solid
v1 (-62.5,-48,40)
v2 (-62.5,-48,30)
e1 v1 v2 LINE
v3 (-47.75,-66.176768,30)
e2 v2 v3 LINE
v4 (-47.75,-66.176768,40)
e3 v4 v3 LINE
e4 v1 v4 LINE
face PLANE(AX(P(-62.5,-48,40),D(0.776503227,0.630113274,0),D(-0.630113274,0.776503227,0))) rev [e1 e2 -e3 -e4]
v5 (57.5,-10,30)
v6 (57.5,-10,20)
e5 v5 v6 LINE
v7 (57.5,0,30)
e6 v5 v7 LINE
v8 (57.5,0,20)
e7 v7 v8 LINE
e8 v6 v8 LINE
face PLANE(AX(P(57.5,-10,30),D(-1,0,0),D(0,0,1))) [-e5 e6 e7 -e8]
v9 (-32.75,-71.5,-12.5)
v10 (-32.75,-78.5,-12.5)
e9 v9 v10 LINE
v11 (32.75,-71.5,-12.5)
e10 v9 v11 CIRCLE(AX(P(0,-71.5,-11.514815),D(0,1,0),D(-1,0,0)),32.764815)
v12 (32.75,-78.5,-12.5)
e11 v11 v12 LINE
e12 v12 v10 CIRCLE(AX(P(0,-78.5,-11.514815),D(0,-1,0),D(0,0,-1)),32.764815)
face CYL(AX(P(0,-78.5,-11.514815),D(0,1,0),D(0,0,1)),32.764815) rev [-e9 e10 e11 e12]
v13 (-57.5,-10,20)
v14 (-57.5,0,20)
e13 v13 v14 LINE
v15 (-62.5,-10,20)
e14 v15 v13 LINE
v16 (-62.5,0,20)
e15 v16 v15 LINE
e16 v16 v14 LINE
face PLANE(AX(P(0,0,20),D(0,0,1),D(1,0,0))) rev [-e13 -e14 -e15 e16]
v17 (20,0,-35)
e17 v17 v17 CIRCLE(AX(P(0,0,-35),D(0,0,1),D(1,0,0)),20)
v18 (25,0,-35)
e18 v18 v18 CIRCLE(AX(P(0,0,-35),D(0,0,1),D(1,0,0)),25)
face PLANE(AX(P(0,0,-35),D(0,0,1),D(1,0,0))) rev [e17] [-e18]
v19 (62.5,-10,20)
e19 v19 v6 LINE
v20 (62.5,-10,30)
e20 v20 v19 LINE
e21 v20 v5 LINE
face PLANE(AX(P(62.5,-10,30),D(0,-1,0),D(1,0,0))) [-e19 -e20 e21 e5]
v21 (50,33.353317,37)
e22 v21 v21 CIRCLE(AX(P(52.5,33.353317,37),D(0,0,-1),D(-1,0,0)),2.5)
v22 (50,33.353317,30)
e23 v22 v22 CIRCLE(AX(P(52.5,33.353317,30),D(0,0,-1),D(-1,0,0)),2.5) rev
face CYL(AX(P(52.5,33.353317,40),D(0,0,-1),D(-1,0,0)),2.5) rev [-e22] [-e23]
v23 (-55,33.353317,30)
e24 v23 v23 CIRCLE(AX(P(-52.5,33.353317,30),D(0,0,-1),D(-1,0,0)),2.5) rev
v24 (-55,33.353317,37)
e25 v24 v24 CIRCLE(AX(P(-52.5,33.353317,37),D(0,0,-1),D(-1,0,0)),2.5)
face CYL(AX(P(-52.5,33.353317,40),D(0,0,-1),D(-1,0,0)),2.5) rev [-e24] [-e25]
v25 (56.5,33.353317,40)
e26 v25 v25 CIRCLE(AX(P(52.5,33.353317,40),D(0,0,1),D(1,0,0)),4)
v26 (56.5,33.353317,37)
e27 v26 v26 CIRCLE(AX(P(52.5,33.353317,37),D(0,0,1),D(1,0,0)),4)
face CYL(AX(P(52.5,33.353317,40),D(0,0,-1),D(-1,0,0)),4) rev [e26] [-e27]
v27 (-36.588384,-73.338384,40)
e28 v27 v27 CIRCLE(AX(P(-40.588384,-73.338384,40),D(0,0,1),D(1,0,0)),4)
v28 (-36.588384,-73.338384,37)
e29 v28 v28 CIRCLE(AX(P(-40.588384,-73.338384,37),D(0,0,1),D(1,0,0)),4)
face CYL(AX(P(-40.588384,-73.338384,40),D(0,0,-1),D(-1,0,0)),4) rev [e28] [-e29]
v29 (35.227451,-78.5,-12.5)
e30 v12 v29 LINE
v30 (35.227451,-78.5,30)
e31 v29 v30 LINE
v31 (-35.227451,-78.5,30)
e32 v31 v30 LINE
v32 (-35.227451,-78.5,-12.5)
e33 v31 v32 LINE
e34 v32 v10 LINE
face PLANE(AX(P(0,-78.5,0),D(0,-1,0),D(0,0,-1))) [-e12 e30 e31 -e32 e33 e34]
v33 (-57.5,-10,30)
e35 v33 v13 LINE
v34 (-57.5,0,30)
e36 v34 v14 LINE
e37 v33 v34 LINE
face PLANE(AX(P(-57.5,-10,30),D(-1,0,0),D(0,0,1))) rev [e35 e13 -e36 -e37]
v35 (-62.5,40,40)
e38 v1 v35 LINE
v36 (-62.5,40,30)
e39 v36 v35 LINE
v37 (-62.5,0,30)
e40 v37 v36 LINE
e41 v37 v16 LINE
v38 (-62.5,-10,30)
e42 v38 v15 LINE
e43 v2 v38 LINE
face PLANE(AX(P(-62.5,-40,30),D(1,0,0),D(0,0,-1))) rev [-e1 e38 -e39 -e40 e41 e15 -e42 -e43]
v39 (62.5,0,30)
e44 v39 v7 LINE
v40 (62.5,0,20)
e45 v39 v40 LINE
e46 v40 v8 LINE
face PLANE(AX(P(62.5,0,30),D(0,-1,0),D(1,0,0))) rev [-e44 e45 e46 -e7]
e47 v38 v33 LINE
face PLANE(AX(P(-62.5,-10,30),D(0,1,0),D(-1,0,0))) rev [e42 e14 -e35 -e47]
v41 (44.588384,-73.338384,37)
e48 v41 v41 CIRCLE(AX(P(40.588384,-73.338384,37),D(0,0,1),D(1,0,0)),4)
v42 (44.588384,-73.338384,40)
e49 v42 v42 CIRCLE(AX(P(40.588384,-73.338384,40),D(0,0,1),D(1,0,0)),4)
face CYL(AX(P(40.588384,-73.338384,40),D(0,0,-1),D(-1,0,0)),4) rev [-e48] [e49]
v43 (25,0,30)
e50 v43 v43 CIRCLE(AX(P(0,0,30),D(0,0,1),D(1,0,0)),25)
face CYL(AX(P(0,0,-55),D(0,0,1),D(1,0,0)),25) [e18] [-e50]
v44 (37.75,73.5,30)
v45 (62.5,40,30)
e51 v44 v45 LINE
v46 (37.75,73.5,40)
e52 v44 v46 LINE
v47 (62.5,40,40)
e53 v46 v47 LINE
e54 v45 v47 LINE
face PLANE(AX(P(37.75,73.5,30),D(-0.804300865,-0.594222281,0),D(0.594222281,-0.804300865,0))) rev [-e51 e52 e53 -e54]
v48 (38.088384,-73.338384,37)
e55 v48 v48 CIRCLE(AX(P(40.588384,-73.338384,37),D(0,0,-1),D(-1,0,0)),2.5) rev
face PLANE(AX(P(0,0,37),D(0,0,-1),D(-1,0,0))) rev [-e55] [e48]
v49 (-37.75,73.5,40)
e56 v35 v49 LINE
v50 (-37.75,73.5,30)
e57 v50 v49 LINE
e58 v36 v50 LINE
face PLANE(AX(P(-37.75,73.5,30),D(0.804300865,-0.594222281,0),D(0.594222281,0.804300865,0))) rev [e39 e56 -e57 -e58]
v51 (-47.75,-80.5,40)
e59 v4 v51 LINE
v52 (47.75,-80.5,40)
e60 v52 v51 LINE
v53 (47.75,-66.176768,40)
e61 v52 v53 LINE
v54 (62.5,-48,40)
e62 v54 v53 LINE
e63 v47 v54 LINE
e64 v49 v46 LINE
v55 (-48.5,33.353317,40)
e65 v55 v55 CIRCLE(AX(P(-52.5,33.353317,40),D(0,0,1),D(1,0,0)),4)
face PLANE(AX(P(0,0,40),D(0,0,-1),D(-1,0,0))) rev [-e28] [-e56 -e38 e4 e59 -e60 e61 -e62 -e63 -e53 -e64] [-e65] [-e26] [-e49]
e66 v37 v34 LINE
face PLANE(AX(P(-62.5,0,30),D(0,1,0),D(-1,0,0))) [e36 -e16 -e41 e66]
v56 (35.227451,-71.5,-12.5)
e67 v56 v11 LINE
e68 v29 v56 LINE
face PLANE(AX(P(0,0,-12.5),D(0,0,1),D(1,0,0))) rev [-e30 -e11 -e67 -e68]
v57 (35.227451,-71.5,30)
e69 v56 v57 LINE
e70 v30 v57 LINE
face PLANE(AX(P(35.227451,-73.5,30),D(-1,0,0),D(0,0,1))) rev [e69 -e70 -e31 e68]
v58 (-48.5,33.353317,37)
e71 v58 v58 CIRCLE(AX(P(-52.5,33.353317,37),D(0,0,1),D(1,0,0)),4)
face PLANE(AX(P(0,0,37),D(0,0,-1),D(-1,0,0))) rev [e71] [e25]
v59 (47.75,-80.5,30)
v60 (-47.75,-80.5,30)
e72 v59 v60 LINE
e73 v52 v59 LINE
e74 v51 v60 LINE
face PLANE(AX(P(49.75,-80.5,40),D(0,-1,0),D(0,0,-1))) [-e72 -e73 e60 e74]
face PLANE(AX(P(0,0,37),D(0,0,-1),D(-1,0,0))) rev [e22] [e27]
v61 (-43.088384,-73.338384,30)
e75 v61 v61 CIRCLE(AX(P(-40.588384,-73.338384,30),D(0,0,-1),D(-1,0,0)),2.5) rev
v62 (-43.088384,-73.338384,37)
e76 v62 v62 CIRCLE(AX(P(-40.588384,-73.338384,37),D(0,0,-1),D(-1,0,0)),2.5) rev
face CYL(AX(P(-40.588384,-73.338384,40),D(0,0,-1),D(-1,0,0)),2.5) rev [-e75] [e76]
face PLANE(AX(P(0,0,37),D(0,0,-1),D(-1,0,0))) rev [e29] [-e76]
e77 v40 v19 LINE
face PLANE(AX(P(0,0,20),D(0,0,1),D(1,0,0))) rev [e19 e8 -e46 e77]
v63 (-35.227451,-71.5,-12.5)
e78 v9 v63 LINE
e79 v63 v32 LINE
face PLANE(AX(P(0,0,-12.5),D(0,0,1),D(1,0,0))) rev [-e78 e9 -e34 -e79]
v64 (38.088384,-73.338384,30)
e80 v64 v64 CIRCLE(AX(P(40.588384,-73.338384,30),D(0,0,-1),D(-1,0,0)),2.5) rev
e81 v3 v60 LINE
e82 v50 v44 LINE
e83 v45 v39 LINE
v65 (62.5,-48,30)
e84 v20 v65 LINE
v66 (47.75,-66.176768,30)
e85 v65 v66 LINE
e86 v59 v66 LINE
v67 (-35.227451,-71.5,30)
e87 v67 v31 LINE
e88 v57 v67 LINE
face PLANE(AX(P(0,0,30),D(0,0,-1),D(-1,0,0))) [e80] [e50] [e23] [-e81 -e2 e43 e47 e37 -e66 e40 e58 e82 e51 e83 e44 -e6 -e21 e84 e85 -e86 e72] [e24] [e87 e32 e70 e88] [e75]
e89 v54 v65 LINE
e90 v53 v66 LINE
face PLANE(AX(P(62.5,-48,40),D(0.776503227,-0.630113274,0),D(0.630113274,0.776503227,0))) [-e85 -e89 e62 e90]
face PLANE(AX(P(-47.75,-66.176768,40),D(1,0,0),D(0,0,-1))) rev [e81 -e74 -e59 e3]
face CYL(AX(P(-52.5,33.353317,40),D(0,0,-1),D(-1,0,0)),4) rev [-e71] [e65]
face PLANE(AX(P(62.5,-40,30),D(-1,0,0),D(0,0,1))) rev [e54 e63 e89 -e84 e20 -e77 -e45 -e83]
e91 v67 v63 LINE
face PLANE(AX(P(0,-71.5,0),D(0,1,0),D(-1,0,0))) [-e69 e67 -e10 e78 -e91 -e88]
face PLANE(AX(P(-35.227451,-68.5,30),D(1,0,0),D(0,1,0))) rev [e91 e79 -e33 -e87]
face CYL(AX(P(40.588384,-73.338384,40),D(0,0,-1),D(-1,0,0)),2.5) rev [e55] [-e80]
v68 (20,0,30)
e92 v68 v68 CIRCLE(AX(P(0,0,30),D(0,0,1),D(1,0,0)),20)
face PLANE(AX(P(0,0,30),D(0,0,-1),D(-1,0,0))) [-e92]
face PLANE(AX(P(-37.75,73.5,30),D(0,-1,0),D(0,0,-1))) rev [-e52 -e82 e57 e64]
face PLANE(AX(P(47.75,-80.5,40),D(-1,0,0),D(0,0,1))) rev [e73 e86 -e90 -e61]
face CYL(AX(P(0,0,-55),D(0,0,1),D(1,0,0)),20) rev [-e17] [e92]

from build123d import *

# Parameters (mm, degrees)
ESTRUSIONE_ESTRUSIONE1_DEPTH      = 30
ESTRUSIONE_ESTRUSIONE1_DEPTH_BACK = 55
SCHIZZO1_R                        = 25
SCHIZZO1_R_2                      = 20
ESTRUSIONE_ESTRUSIONE2_DEPTH      = 10
ESTRUSIONE_ESTRUSIONE3_DEPTH      = 10
ESTRUSIONE_ESTRUSIONE5_DEPTH      = 42.5
TAGLIO_ESTRUSIONE1_DEPTH          = 26.5
SCHIZZO3D5_R                      = 2.5
TAGLIO_ESTRUSIONE2_DEPTH          = 35.5
SCHIZZO3D6_R                      = 4
TAGLIO_ESTRUSIONE3_DEPTH          = 3
ESTRUSIONE_ESTRUSIONE10_DEPTH     = 5
TAGLIO_ESTRUSIONE4_START          = -14
TAGLIO_ESTRUSIONE4_DEPTH          = 14
TAGLIO_ESTRUSIONE7_DEPTH          = 3
ESTRUSIONE_ESTRUSIONE11_START     = 30
ESTRUSIONE_ESTRUSIONE11_OUTLINE_R = 4
ESTRUSIONE_ESTRUSIONE11_DEPTH     = 10
ESTRUSIONE_ESTRUSIONE12_DEPTH     = 10
ESTRUSIONE_ESTRUSIONE13_DEPTH     = 10
ESTRUSIONE_ESTRUSIONE14_DEPTH     = 10
TAGLIO_ESTRUSIONE11_DEPTH         = 80
SCHIZZO3D17_R                     = 4
TAGLIO_ESTRUSIONE12_DEPTH         = 3
TAGLIO_ESTRUSIONE13_START         = 30
TAGLIO_ESTRUSIONE13_OUTLINE_R     = 2.5
TAGLIO_ESTRUSIONE13_DEPTH         = 7
TAGLIO_ESTRUSIONE14_START         = -55
TAGLIO_ESTRUSIONE14_OUTLINE_R     = 25
TAGLIO_ESTRUSIONE14_OUTLINE_R_2   = 20
TAGLIO_ESTRUSIONE14_DEPTH         = 20


# Read off the part's stored shape, not the designer's step: Estrusione-Estrusione11, Taglio-Estrusione13, Taglio-Estrusione14
with BuildPart() as part:
    # Schizzo1 → Estrusione-Estrusione1 (new, two sides: drawn at the far end of the back side and taken through both)
    with BuildSketch(Plane.XY.offset(-ESTRUSIONE_ESTRUSIONE1_DEPTH_BACK)):
        Circle(SCHIZZO1_R)
        Circle(SCHIZZO1_R_2, mode=Mode.SUBTRACT)
    extrude(amount=ESTRUSIONE_ESTRUSIONE1_DEPTH + ESTRUSIONE_ESTRUSIONE1_DEPTH_BACK)

    # Schizzo3D1 → Estrusione-Estrusione2 (add)
    with BuildSketch(Plane(origin=(-37.75, 73.5, 30), x_dir=(0.4568693936855125, -0.889533786381064, 0), z_dir=(0, 0, -1))):
        Polygon((0, 0), (34.493639223, -67.159800872), (75.600538561, -73.870637396), (146.763241471, -37.321085901), (165.255105821, 0), (130.761466598, 67.159800872), (89.654567261, 73.870637396), (18.49186435, 37.321085901), align=None)
    extrude(amount=-ESTRUSIONE_ESTRUSIONE2_DEPTH)

    # Schizzo3D2 → Estrusione-Estrusione3 (add)
    with BuildSketch(Plane(origin=(62.5, 0, 30), x_dir=(-0.9968152785361251, -0.07974522228289001, 0), z_dir=(0, 0, 1))):
        Polygon((0, 0), (0.797452223, 9.968152785), (5.781528616, 9.569426674), (4.984076393, -0.398726111), align=None)
        Polygon((125.39936204, 0), (120.415285647, 0.398726111), (119.617833424, -9.569426674), (124.601909817, -9.968152785), align=None)
    extrude(amount=-ESTRUSIONE_ESTRUSIONE3_DEPTH)

    # Schizzo3D3 → Estrusione-Estrusione5 (add)
    with BuildSketch(Plane(origin=(35.227450684, -68.5, 30), x_dir=(-0.9974912873801348, -0.0707893466612134, 0), z_dir=(0, 0, 1))):
        Polygon((0, 0), (70.278150268, -4.987456437), (70.632097001, 0), (0.353946733, 4.987456437), align=None)
    extrude(amount=-ESTRUSIONE_ESTRUSIONE5_DEPTH)

    # Schizzo3D4 → Taglio-Estrusione1 (cut)
    with BuildSketch(Plane(origin=(32.75, -68.5, -12.5), x_dir=(-1, 0, 0), z_dir=(0, 1, 0))):
        with BuildLine():
            Line((0, 0), (65.5, 0))
            ThreePointArc((65.5, 0), (32.75, 32.75), (0, 0))
        make_face()
    extrude(amount=-TAGLIO_ESTRUSIONE1_DEPTH, mode=Mode.SUBTRACT)

    # Schizzo3D5 → Taglio-Estrusione2 (cut)
    with BuildSketch(Plane(origin=(-52.5, 33.353317087, 40), x_dir=(0.8440673996564301, -0.5362370975951146, 0), z_dir=(0, 0, -1))):
        with Locations(Location((0, 0, 0), (0, 0, 147.572152721))):
            Circle(SCHIZZO3D5_R)
        with Locations(Location((88.627076964, -56.304895247, 0), (0, 0, 147.572152721))):
            Circle(SCHIZZO3D5_R)
        with Locations(Location((124.397648864, 0, 0), (0, 0, 147.572152721))):
            Circle(SCHIZZO3D5_R)
        with Locations(Location((35.7705719, 56.304895247, 0), (0, 0, 147.572152721))):
            Circle(SCHIZZO3D5_R)
    extrude(amount=TAGLIO_ESTRUSIONE2_DEPTH, mode=Mode.SUBTRACT)

    # Schizzo3D6 → Taglio-Estrusione3 (cut)
    with BuildSketch(Plane(origin=(0, 73.5, 40), x_dir=(0, -1, 0), z_dir=(0, 0, -1))):
        with Locations(Location((40.146682913, 52.5, 0), (0, 0, 270))):
            Circle(SCHIZZO3D6_R)
        with Locations(Location((40.146682913, -52.5, 0), (0, 0, 270))):
            Circle(SCHIZZO3D6_R)
        with Locations(Location((106.853317087, -52.5, 0), (0, 0, 270))):
            Circle(SCHIZZO3D6_R)
        with Locations(Location((106.853317087, 52.5, 0), (0, 0, 270))):
            Circle(SCHIZZO3D6_R)
    extrude(amount=TAGLIO_ESTRUSIONE3_DEPTH, mode=Mode.SUBTRACT)

    # Schizzo3D7 → Estrusione-Estrusione10 (add)
    with BuildSketch(Plane(origin=(35.227450684, -73.5, -12.5), x_dir=(-0.8117651174974726, 0, 0.5839840700004706), z_dir=(0, 1, 0))):
        with BuildLine():
            Line((0, 0), (2.011108045, -1.446791734))
            ThreePointArc((2.011108045, -1.446791734), (47.721893936, 6.013037572), (55.181723242, -39.697748319))
            Line((55.181723242, -39.697748319), (57.192831287, -41.144540052))
            Line((57.192831287, -41.144540052), (82.012154262, -6.644522559))
            Line((82.012154262, -6.644522559), (84.059871804, -8.117651175))
            Line((84.059871804, -8.117651175), (89.899712504, 0))
            Line((89.899712504, 0), (28.611446133, 44.090797285))
            Line((28.611446133, 44.090797285), (22.771605433, 35.97314611))
            Line((22.771605433, 35.97314611), (24.819322975, 34.500017494))
            Line((24.819322975, 34.500017494), (0, 0))
        make_face()
    extrude(amount=-ESTRUSIONE_ESTRUSIONE10_DEPTH)

    # Schizzo3D8 → Taglio-Estrusione4 (cut)
    with BuildSketch(Plane(origin=(0, -78.5, 20.25), x_dir=(-0.707106781186551, 0, -0.7071067811865441), z_dir=(0, -1, 0)).offset(TAGLIO_ESTRUSIONE4_START)):
        with BuildLine():
            ThreePointArc((0, 46.315494168), (-0.707106781, -0.707106781), (46.315494168, 0))
            ThreePointArc((46.315494168, 0), (0, 0), (0, 46.315494168))
        make_face()
    extrude(amount=TAGLIO_ESTRUSIONE4_DEPTH, mode=Mode.SUBTRACT)

    # Schizzo3D9 → Taglio-Estrusione7 (cut)
    with BuildSketch(Plane(origin=(35.227450684, -68.5, -12.5), x_dir=(-0.8562730712113632, 0, 0.5165234046180869), z_dir=(0, -1, 0))):
        with BuildLine():
            Line((0, 0), (2.121374306, 1.279661262))
            ThreePointArc((2.121374306, 1.279661262), (13.749394894, 45.407843828), (58.20726047, 35.111944264))
            Line((58.20726047, 35.111944264), (60.328634776, 36.391605526))
            Line((60.328634776, 36.391605526), (82.280879472, 0))
            Line((82.280879472, 0), (21.952244696, -36.391605526))
            Line((21.952244696, -36.391605526), (0, 0))
        make_face()
    extrude(amount=TAGLIO_ESTRUSIONE7_DEPTH, mode=Mode.SUBTRACT)

    # Estrusione-Estrusione11 outline → Estrusione-Estrusione11 (add)
    with BuildSketch(Plane.XY.offset(ESTRUSIONE_ESTRUSIONE11_START)):
        with Locations((52.5, -33.353317087)):
            Circle(ESTRUSIONE_ESTRUSIONE11_OUTLINE_R)
        with Locations((-52.5, -33.353317087)):
            Circle(ESTRUSIONE_ESTRUSIONE11_OUTLINE_R)
    extrude(amount=ESTRUSIONE_ESTRUSIONE11_DEPTH)

    # Schizzo3D11 → Estrusione-Estrusione12 (add)
    with BuildSketch(Plane(origin=(-62.5, -40, 40), x_dir=(0.9979582700578467, -0.06386932928370219, 0), z_dir=(0, 0, -1))):
        Polygon((0, 0), (0.510954634, 7.98366616), (27.158436361, 36.840627497), (26.839089715, 31.850836147), align=None)
        Polygon((102.504285751, 32.018493137), (102.184939104, 27.028701786), (124.744783757, -7.98366616), (125.255738392, 0), align=None)
    extrude(amount=ESTRUSIONE_ESTRUSIONE12_DEPTH)

    # Schizzo3D12 → Estrusione-Estrusione13 (add)
    with BuildSketch(Plane(origin=(-37.75, -78.5, 40), x_dir=(0.9932296706390209, 0.11616721294023631, 0), z_dir=(0, 0, 1))):
        Polygon((0, 0), (-9.932296706, 1.161672129), (-8.770624577, 11.093968836), (1.161672129, 9.932296706), align=None)
        Polygon((74.988840133, -8.770624577), (84.92113684, -9.932296706), (86.082808969, 0), (76.150512263, 1.161672129), align=None)
    extrude(amount=-ESTRUSIONE_ESTRUSIONE13_DEPTH)

    # Schizzo3D15 → Estrusione-Estrusione14 (add)
    with BuildSketch(Plane(origin=(-49.75, -63.712121212, 40), x_dir=(0.9860632358712049, -0.16637095558783233, 0), z_dir=(0, 0, 1))):
        Polygon((0, 0), (4.627662115, -4.074759177), (2.768690441, -4.388409339), (4.432399997, -14.249041698), (98.601439022, 1.639384561), (96.937729467, 11.500016919), (95.078757792, 11.186366757), (98.113291969, 16.553910081), (100.573565494, 1.972126472), (100.906307405, 0), (2.793015436, -16.553910081), (2.460273525, -14.581783609), align=None)
    extrude(amount=-ESTRUSIONE_ESTRUSIONE14_DEPTH)

    # Schizzo3D16 → Taglio-Estrusione11 (cut)
    with BuildSketch(Plane(origin=(-49.75, -80.5, 40), x_dir=(0.9860632358712049, 0.16637095558783233, 0), z_dir=(0, 0, 1))):
        Polygon((0, 0), (1.972126472, -0.332741911), (4.35509632, 13.790870902), (2.793015436, 16.553910081), align=None)
        Polygon((98.113291969, -16.553910081), (96.141165497, -16.22116817), (98.524135346, -2.097555357), (100.906307405, 0), align=None)
    extrude(amount=-TAGLIO_ESTRUSIONE11_DEPTH, mode=Mode.SUBTRACT)

    # Schizzo3D17 → Taglio-Estrusione12 (cut)
    with BuildSketch(Plane(origin=(0, -80.5, 40), x_dir=(-0.9847878761773714, 0.17376086709631217, 0), z_dir=(0, 0, -1))):
        with Locations(Location((41.215356952, 0, 0), (0, 0, 169.993443701))):
            Circle(SCHIZZO3D17_R)
        with Locations(Location((-38.726539684, 14.10534554, 0), (0, 0, 169.993443701))):
            Circle(SCHIZZO3D17_R)
    extrude(amount=TAGLIO_ESTRUSIONE12_DEPTH, mode=Mode.SUBTRACT)

    # Taglio-Estrusione13 outline → Taglio-Estrusione13 (cut)
    with BuildSketch(Plane.XY.offset(TAGLIO_ESTRUSIONE13_START)):
        with Locations((-40.588383838, -73.338383838)):
            Circle(TAGLIO_ESTRUSIONE13_OUTLINE_R)
        with Locations((40.588383838, -73.338383838)):
            Circle(TAGLIO_ESTRUSIONE13_OUTLINE_R)
    extrude(amount=TAGLIO_ESTRUSIONE13_DEPTH, mode=Mode.SUBTRACT)

    # Taglio-Estrusione14 outline → Taglio-Estrusione14 (cut)
    with BuildSketch(Plane.XY.offset(TAGLIO_ESTRUSIONE14_START)):
        Circle(TAGLIO_ESTRUSIONE14_OUTLINE_R)
        Circle(TAGLIO_ESTRUSIONE14_OUTLINE_R_2, mode=Mode.SUBTRACT)
    extrude(amount=TAGLIO_ESTRUSIONE14_DEPTH, mode=Mode.SUBTRACT)


solid = part.part
